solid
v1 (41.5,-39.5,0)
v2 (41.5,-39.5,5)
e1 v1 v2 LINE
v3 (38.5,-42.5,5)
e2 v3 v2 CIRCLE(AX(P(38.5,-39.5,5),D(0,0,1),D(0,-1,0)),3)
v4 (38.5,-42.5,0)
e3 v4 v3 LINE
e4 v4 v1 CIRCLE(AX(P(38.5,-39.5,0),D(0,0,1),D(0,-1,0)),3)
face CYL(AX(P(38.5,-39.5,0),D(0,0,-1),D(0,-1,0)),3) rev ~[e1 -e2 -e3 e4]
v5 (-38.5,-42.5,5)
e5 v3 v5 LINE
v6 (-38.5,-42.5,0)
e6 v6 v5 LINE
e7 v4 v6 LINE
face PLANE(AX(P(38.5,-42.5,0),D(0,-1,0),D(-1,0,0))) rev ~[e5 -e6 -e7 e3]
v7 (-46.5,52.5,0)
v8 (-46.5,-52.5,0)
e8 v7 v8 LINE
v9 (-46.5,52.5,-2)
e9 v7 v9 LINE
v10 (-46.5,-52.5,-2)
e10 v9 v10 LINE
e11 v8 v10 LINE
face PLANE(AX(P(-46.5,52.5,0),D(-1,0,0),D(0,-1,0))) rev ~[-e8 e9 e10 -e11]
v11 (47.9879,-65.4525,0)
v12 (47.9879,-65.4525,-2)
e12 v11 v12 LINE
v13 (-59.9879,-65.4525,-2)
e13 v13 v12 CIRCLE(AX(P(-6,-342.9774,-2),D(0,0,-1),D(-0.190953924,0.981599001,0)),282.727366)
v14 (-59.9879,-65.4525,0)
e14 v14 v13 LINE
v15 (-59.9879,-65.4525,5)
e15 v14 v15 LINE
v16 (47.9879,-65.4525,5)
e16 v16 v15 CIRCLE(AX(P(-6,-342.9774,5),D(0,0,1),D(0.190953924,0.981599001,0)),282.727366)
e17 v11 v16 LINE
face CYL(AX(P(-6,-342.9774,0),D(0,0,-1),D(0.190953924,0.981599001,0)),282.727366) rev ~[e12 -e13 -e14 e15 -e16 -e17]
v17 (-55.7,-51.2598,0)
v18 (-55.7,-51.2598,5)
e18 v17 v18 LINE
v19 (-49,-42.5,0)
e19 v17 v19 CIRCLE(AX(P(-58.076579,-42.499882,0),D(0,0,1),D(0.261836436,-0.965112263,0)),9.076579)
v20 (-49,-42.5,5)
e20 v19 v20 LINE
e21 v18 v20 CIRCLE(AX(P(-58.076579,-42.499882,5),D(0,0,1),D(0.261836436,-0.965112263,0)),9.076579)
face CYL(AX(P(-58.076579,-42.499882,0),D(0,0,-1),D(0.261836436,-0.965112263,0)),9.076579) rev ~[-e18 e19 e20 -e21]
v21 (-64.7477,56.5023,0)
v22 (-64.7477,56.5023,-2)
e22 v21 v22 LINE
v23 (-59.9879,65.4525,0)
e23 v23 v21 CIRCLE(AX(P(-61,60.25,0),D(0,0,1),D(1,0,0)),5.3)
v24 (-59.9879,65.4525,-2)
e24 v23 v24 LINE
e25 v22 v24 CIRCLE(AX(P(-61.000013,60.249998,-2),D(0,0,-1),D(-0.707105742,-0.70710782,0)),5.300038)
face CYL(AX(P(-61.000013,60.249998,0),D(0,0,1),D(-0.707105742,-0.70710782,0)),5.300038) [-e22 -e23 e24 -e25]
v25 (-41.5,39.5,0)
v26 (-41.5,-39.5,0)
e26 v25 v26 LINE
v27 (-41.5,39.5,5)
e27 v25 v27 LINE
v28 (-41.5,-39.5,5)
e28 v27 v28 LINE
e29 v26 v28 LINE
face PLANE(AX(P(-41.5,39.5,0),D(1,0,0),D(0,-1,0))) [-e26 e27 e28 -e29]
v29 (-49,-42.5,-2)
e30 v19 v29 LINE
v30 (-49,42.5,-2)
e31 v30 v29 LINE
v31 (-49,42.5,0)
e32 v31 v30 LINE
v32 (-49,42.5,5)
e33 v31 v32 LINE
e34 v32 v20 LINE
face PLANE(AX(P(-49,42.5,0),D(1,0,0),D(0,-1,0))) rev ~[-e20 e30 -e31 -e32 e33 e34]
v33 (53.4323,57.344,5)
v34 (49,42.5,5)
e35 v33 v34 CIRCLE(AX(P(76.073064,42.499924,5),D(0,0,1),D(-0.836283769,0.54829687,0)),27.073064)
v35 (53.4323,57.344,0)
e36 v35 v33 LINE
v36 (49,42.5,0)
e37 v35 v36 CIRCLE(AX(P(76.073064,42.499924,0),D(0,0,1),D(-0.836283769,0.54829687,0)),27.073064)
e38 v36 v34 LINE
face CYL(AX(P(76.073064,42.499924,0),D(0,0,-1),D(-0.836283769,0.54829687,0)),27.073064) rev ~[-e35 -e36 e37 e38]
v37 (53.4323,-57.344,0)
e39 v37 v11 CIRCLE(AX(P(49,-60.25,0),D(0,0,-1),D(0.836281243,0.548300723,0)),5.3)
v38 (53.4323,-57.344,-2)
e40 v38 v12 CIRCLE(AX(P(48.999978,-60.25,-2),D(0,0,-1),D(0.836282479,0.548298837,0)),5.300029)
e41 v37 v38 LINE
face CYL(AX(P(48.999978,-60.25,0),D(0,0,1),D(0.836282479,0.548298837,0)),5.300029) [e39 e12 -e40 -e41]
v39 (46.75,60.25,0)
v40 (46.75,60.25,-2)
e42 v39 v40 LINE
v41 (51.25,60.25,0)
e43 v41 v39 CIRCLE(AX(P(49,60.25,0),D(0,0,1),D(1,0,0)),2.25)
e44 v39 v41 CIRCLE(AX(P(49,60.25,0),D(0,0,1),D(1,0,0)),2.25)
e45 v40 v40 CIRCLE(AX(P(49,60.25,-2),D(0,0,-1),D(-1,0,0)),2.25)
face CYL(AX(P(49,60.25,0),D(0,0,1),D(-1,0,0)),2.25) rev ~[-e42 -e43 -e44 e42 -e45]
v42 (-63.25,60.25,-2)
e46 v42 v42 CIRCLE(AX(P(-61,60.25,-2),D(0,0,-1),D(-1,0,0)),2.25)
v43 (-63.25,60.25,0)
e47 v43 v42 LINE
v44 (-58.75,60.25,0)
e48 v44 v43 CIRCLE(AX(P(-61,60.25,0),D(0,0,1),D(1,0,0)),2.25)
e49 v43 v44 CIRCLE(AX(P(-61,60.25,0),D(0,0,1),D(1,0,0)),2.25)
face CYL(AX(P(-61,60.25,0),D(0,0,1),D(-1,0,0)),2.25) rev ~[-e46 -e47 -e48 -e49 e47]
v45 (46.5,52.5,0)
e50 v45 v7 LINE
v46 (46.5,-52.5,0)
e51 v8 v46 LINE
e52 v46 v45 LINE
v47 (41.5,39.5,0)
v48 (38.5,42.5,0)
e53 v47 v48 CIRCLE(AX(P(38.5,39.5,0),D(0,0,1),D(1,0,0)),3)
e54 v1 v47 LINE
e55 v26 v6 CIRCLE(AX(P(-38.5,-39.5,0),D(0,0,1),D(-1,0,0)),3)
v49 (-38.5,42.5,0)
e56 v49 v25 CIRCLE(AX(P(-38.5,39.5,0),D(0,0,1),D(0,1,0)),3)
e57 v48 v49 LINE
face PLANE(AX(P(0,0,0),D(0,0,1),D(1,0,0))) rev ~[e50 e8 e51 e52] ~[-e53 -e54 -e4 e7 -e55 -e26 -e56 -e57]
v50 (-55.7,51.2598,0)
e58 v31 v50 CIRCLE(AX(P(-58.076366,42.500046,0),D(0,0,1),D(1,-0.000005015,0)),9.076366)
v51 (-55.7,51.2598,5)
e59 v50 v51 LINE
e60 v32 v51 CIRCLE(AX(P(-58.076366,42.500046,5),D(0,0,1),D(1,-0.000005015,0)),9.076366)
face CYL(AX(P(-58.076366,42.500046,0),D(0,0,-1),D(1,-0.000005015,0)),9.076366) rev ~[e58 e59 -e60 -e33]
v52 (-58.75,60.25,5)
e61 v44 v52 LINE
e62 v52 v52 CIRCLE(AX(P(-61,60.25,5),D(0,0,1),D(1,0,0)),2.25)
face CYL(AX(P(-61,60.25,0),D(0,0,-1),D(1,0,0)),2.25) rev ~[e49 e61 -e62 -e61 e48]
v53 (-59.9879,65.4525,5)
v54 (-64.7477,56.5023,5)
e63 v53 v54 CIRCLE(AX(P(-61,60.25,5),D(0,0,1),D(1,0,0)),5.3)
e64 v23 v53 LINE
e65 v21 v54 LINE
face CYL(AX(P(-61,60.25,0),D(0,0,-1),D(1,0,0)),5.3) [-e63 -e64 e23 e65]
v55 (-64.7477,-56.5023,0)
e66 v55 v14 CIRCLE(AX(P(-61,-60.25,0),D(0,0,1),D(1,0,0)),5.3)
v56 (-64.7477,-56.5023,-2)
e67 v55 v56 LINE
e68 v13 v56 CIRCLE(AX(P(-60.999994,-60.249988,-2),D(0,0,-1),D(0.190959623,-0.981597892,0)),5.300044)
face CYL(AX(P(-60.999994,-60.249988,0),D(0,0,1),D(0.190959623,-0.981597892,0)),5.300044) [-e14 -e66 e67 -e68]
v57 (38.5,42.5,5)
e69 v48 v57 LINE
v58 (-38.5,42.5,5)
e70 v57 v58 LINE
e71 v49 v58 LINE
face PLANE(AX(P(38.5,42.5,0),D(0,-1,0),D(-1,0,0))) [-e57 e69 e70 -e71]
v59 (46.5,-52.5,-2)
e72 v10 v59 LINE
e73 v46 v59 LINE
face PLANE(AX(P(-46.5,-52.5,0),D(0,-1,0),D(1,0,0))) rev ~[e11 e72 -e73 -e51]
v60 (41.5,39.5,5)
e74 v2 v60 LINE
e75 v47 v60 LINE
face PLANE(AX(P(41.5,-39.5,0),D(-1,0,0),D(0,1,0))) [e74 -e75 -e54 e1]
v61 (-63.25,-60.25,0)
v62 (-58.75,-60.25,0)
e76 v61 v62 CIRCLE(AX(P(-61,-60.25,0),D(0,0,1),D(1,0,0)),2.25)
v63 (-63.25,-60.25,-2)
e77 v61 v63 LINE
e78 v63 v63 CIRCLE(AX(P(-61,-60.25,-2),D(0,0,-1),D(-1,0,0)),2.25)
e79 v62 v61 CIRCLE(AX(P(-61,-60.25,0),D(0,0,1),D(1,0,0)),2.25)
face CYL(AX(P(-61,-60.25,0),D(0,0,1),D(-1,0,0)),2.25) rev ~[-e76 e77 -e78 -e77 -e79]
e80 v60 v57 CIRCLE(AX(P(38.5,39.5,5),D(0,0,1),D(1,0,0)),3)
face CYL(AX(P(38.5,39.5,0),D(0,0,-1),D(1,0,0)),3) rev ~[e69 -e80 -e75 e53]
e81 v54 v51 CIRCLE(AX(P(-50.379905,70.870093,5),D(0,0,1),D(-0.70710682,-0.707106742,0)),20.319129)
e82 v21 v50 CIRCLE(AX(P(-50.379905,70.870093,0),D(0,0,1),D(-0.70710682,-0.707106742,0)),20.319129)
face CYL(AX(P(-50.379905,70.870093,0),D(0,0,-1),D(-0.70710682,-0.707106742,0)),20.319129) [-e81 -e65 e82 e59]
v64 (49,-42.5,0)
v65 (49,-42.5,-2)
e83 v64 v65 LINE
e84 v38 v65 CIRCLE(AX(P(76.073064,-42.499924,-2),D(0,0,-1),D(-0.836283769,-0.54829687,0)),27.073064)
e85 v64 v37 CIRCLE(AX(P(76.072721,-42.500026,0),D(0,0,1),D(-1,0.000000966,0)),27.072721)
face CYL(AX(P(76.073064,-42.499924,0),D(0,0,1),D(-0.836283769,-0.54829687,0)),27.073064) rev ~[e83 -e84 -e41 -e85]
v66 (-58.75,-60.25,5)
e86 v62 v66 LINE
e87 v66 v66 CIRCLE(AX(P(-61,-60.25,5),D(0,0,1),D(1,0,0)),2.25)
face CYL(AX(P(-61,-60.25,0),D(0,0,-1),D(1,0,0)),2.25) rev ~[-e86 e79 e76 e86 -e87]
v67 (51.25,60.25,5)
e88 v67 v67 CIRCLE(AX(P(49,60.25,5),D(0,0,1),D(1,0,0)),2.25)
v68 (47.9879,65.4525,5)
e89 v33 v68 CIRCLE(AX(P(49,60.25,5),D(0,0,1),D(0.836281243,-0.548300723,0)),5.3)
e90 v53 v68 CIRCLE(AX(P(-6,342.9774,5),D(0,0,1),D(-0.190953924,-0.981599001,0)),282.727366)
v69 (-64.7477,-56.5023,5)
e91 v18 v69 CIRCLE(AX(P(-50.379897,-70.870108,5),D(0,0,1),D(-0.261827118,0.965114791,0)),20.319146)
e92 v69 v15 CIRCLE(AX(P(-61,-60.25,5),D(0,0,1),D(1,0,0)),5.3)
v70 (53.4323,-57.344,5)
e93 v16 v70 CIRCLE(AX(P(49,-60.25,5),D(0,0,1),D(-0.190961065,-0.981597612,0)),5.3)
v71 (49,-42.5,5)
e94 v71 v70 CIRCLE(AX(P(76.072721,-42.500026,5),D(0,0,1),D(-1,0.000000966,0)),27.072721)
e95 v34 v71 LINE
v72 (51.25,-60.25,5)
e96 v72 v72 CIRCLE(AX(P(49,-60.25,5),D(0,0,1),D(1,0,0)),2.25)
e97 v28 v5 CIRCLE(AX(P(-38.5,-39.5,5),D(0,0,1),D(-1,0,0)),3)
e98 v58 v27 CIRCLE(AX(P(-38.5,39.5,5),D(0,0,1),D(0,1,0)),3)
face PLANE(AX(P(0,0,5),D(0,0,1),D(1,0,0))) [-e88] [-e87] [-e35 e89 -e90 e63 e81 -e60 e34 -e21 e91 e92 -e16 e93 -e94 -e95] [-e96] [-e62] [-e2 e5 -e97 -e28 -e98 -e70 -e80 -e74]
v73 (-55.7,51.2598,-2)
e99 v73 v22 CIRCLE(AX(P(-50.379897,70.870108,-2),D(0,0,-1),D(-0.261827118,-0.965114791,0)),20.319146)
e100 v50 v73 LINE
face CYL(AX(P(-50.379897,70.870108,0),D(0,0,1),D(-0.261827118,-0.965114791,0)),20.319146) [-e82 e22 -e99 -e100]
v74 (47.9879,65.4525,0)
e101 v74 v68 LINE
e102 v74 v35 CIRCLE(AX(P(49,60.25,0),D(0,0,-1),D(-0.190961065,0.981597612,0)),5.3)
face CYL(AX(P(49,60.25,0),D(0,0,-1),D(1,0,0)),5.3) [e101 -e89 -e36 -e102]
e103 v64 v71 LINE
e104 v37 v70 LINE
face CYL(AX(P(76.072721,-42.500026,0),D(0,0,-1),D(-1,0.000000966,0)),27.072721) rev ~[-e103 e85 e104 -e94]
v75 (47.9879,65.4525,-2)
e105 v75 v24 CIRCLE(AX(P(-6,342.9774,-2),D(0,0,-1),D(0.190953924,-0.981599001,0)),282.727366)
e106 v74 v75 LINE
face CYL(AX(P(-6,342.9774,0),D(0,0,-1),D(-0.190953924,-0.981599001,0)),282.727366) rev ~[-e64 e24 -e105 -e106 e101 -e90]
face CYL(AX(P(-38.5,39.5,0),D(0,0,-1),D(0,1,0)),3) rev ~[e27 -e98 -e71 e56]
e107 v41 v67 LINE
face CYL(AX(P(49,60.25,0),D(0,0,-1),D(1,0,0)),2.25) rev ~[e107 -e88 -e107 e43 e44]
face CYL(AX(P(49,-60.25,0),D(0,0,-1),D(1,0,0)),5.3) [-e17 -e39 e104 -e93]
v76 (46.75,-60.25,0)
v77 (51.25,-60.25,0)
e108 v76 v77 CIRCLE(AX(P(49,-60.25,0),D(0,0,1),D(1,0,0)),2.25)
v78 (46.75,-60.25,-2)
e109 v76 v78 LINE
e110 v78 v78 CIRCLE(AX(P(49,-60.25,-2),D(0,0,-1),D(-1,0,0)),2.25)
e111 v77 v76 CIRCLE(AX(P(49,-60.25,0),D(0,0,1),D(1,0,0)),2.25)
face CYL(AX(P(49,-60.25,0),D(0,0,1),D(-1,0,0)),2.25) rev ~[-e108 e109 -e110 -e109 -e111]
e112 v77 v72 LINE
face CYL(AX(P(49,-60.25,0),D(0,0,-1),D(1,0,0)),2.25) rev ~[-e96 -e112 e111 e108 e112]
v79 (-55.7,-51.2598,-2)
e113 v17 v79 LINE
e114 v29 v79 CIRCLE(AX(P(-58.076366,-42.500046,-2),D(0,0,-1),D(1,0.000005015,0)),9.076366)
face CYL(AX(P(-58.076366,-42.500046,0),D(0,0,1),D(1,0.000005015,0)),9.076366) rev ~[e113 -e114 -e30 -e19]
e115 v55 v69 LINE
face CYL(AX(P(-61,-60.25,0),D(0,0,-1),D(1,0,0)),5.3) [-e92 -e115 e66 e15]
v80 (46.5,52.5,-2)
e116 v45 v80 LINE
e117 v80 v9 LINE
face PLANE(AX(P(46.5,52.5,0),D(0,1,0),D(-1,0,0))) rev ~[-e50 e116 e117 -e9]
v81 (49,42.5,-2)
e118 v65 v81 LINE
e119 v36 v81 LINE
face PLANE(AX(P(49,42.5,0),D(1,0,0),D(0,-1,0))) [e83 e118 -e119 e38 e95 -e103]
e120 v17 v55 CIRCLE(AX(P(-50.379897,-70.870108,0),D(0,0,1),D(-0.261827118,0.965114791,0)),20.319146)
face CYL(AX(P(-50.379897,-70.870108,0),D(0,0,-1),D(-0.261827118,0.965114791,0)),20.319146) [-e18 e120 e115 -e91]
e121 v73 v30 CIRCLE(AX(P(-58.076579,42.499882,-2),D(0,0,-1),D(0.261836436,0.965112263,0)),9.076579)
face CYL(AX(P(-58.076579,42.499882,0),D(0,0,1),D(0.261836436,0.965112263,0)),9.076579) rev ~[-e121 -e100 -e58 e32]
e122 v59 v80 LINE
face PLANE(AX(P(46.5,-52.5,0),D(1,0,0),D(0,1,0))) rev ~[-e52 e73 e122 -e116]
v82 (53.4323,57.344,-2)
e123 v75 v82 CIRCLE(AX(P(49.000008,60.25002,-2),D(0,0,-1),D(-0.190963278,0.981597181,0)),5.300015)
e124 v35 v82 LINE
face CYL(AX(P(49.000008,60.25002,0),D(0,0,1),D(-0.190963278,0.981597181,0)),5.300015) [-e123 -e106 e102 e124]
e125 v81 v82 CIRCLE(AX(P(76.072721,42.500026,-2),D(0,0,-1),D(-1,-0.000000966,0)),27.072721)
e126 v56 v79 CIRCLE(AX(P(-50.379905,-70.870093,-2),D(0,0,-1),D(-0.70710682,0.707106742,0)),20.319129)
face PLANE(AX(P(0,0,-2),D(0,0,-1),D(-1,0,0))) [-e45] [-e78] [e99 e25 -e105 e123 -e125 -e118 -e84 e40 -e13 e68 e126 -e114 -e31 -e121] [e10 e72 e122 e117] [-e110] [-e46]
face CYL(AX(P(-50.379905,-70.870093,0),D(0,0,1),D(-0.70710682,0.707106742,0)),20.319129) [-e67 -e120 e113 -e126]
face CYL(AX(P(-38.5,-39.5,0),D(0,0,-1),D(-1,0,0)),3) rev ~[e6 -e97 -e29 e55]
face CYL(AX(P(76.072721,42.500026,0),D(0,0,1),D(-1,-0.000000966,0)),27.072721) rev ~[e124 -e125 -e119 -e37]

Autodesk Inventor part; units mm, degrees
ref_plane "YZ Plane" through (0, 0, 0) normal (1, 0, 0) x (0, 1, 0)
ref_plane "XZ Plane" through (0, 0, 0) normal (0, 1, 0) x (-1, 0, 0)
ref_plane "XY Plane" through (0, 0, 0) normal (0, 0, 1) x (1, 0, 0)
sketch "Skizze1" plane through (0, 0, 0) normal (0, 0, 1) x (1, 0, 0)
  line L0 (46.5, 52.5) -> (-46.5, 52.5) projected
  line L1 (-46.5, 52.5) -> (-46.5, -52.5) projected
  line L2 (-46.5, -52.5) -> (46.5, -52.5) projected
  line L3 (46.5, -52.5) -> (46.5, 52.5) projected
  circle A0 centre (49, -60.25) radius 5.3 projected
  circle A1 centre (49, -60.25) radius 2 projected
  circle A2 centre (49, 60.25) radius 5.3 projected
  circle A3 centre (49, 60.25) radius 2 projected
  circle A4 centre (-61, 60.25) radius 5.3 projected
  circle A5 centre (-61, 60.25) radius 2 projected
  circle A6 centre (-61, -60.25) radius 5.3 projected
  circle A7 centre (-61, -60.25) radius 2 projected
  line L4 (49, 60.25) -> (-61, 60.25) construction
  line L5 (49, -60.25) -> (-61, -60.25) construction
  arc A8 (-59.9879, 65.4525) -> (47.9879, 65.4525) centre (-6, 342.9774) ccw
  arc A9 (47.9879, -65.4525) -> (-59.9879, -65.4525) centre (-6, -342.9774) ccw
  line L6 (-41.5, 39.5) -> (-41.5, -39.5)
  line L7 (41.5, -39.5) -> (41.5, 39.5)
  line L8 (38.5, 42.5) -> (-38.5, 42.5)
  line L9 (38.5, -42.5) -> (-38.5, -42.5)
  arc A10 (41.5, 39.5) -> (38.5, 42.5) centre (38.5, 39.5) ccw
  arc A11 (38.5, -42.5) -> (41.5, -39.5) centre (38.5, -39.5) ccw
  arc A12 (-41.5, -39.5) -> (-38.5, -42.5) centre (-38.5, -39.5) ccw
  arc A13 (-38.5, 42.5) -> (-41.5, 39.5) centre (-38.5, 39.5) ccw
  line L10 (-49, 42.5) -> (-49, -42.5)
  line L11 (49, 42.5) -> (49, -42.5)
  arc A14 (-64.7477, 56.5023) -> (-55.7, 51.2598) centre (-50.3799, 70.8701) ccw
  arc A15 (-49, 42.5) -> (-55.7, 51.2598) centre (-58.0765, 42.5) ccw
  arc A16 (-59.9879, 65.4525) -> (-64.7477, 56.5023) centre (-61, 60.25) ccw
  arc A17 (-55.7, -51.2598) -> (-64.7477, -56.5023) centre (-50.3799, -70.8701) ccw
  arc A18 (-55.7, -51.2598) -> (-49, -42.5) centre (-58.0765, -42.5) ccw
  arc A19 (-64.7477, -56.5023) -> (-59.9879, -65.4525) centre (-61, -60.25) ccw
  arc A20 (53.4323, 57.344) -> (49, 42.5) centre (76.0729, 42.5) ccw
  arc A21 (49, -42.5) -> (53.4323, -57.344) centre (76.0729, -42.5) ccw
  arc A22 (53.4323, 57.344) -> (47.9879, 65.4525) centre (49, 60.25) ccw
  arc A23 (47.9879, -65.4525) -> (53.4323, -57.344) centre (49, -60.25) ccw
  circle A24 centre (49, -60.25) radius 2.25
  circle A25 centre (-61, -60.25) radius 2.25
  circle A26 centre (-61, 60.25) radius 2.25
  circle A27 centre (49, 60.25) radius 2.25
  point P0 (-6, 60.25)
  point P1 (-6, -60.25)
  point P2 (-55.7, 60.25)
  dimension "d34" = 5
  dimension "d35" = 5
  dimension "d36" = 10
  dimension "d37" = 10
  dimension "d38" = 3
  dimension "d39" = 2.5
  dimension "d40" = 2.5
  dimension "d41" = 45
  dimension "d42" = 45
  dimension "d43" = 0.25
  dimension "d44" = 0.25
  dimension "d45" = 0.25
  dimension "d46" = 0.25
extrude "Extrusion1" add sketch "Skizze1" along normal blind 5 contours L3 L2 L1 L0 | A0 | A0 A9 A6 A17 A18 L10 A15 A14 A4 A8 A2 A20 L11 A21 | A6 | A2 | A4
sketch "Skizze2" plane through (0, 0, 0) normal (0, 0, -1) x (-1, 0, 0)
  arc A0 (59.9879, -65.4525) -> (64.7477, -56.5023) centre (61, -60.25) ccw projected
  arc A1 (64.7477, 56.5023) -> (59.9879, 65.4525) centre (61, 60.25) ccw projected
  line L0 (-46.5, 52.5) -> (46.5, 52.5) projected
  line L1 (46.5, 52.5) -> (46.5, -52.5) projected
  line L2 (46.5, -52.5) -> (-46.5, -52.5) projected
  line L3 (-46.5, -52.5) -> (-46.5, 52.5) projected
  line L4 (47, 53) -> (-47, 53)
  line L5 (-47, 53) -> (-47, -53)
  line L6 (-47, -53) -> (47, -53)
  line L7 (47, -53) -> (47, 53)
  arc A2 (-47.9879, 65.4525) -> (-53.4323, 57.344) centre (-49, 60.25) ccw projected
  arc A3 (-47.9879, 65.4525) -> (59.9879, 65.4525) centre (6, 342.9774) ccw projected
  arc A4 (-49, 42.5) -> (-53.4323, 57.344) centre (-76.0729, 42.5) ccw projected
  line L8 (-49, -42.5) -> (-49, 42.5) projected
  arc A5 (-53.4323, -57.344) -> (-49, -42.5) centre (-76.0729, -42.5) ccw projected
  arc A6 (-53.4323, -57.344) -> (-47.9879, -65.4525) centre (-49, -60.25) ccw projected
  arc A7 (59.9879, -65.4525) -> (-47.9879, -65.4525) centre (6, -342.9774) ccw projected
  arc A8 (64.7477, -56.5023) -> (55.7, -51.2598) centre (50.3799, -70.8701) ccw projected
  arc A9 (49, -42.5) -> (55.7, -51.2598) centre (58.0765, -42.5) ccw projected
  line L9 (49, 42.5) -> (49, -42.5) projected
  arc A10 (55.7, 51.2598) -> (49, 42.5) centre (58.0765, 42.5) ccw projected
  arc A11 (55.7, 51.2598) -> (64.7477, 56.5023) centre (50.3799, 70.8701) ccw projected
  circle A12 centre (61, 60.25) radius 2.25 projected
  circle A13 centre (61, -60.25) radius 2.25 projected
  circle A14 centre (-49, -60.25) radius 2.25 projected
  circle A15 centre (-49, 60.25) radius 2.25 projected
  point P0 (0, 0)
  dimension "d30" = 0.5
extrude "Extrusion2" add sketch "Skizze2" along normal blind 2 contours A7 A6 A5 L8 A4 A2 A3 A1 A11 A10 L9 A9 A8 A0 | L7 L6 L5 L4
equation "\"d35\" = d34"
equation "\"d37\" = d36"
equation "\"d40\" = d39"
equation "\"d44\" = d43"
equation "\"d45\" = d43"
equation "\"d46\" = d43"
properties part number "jetson_deckel"
